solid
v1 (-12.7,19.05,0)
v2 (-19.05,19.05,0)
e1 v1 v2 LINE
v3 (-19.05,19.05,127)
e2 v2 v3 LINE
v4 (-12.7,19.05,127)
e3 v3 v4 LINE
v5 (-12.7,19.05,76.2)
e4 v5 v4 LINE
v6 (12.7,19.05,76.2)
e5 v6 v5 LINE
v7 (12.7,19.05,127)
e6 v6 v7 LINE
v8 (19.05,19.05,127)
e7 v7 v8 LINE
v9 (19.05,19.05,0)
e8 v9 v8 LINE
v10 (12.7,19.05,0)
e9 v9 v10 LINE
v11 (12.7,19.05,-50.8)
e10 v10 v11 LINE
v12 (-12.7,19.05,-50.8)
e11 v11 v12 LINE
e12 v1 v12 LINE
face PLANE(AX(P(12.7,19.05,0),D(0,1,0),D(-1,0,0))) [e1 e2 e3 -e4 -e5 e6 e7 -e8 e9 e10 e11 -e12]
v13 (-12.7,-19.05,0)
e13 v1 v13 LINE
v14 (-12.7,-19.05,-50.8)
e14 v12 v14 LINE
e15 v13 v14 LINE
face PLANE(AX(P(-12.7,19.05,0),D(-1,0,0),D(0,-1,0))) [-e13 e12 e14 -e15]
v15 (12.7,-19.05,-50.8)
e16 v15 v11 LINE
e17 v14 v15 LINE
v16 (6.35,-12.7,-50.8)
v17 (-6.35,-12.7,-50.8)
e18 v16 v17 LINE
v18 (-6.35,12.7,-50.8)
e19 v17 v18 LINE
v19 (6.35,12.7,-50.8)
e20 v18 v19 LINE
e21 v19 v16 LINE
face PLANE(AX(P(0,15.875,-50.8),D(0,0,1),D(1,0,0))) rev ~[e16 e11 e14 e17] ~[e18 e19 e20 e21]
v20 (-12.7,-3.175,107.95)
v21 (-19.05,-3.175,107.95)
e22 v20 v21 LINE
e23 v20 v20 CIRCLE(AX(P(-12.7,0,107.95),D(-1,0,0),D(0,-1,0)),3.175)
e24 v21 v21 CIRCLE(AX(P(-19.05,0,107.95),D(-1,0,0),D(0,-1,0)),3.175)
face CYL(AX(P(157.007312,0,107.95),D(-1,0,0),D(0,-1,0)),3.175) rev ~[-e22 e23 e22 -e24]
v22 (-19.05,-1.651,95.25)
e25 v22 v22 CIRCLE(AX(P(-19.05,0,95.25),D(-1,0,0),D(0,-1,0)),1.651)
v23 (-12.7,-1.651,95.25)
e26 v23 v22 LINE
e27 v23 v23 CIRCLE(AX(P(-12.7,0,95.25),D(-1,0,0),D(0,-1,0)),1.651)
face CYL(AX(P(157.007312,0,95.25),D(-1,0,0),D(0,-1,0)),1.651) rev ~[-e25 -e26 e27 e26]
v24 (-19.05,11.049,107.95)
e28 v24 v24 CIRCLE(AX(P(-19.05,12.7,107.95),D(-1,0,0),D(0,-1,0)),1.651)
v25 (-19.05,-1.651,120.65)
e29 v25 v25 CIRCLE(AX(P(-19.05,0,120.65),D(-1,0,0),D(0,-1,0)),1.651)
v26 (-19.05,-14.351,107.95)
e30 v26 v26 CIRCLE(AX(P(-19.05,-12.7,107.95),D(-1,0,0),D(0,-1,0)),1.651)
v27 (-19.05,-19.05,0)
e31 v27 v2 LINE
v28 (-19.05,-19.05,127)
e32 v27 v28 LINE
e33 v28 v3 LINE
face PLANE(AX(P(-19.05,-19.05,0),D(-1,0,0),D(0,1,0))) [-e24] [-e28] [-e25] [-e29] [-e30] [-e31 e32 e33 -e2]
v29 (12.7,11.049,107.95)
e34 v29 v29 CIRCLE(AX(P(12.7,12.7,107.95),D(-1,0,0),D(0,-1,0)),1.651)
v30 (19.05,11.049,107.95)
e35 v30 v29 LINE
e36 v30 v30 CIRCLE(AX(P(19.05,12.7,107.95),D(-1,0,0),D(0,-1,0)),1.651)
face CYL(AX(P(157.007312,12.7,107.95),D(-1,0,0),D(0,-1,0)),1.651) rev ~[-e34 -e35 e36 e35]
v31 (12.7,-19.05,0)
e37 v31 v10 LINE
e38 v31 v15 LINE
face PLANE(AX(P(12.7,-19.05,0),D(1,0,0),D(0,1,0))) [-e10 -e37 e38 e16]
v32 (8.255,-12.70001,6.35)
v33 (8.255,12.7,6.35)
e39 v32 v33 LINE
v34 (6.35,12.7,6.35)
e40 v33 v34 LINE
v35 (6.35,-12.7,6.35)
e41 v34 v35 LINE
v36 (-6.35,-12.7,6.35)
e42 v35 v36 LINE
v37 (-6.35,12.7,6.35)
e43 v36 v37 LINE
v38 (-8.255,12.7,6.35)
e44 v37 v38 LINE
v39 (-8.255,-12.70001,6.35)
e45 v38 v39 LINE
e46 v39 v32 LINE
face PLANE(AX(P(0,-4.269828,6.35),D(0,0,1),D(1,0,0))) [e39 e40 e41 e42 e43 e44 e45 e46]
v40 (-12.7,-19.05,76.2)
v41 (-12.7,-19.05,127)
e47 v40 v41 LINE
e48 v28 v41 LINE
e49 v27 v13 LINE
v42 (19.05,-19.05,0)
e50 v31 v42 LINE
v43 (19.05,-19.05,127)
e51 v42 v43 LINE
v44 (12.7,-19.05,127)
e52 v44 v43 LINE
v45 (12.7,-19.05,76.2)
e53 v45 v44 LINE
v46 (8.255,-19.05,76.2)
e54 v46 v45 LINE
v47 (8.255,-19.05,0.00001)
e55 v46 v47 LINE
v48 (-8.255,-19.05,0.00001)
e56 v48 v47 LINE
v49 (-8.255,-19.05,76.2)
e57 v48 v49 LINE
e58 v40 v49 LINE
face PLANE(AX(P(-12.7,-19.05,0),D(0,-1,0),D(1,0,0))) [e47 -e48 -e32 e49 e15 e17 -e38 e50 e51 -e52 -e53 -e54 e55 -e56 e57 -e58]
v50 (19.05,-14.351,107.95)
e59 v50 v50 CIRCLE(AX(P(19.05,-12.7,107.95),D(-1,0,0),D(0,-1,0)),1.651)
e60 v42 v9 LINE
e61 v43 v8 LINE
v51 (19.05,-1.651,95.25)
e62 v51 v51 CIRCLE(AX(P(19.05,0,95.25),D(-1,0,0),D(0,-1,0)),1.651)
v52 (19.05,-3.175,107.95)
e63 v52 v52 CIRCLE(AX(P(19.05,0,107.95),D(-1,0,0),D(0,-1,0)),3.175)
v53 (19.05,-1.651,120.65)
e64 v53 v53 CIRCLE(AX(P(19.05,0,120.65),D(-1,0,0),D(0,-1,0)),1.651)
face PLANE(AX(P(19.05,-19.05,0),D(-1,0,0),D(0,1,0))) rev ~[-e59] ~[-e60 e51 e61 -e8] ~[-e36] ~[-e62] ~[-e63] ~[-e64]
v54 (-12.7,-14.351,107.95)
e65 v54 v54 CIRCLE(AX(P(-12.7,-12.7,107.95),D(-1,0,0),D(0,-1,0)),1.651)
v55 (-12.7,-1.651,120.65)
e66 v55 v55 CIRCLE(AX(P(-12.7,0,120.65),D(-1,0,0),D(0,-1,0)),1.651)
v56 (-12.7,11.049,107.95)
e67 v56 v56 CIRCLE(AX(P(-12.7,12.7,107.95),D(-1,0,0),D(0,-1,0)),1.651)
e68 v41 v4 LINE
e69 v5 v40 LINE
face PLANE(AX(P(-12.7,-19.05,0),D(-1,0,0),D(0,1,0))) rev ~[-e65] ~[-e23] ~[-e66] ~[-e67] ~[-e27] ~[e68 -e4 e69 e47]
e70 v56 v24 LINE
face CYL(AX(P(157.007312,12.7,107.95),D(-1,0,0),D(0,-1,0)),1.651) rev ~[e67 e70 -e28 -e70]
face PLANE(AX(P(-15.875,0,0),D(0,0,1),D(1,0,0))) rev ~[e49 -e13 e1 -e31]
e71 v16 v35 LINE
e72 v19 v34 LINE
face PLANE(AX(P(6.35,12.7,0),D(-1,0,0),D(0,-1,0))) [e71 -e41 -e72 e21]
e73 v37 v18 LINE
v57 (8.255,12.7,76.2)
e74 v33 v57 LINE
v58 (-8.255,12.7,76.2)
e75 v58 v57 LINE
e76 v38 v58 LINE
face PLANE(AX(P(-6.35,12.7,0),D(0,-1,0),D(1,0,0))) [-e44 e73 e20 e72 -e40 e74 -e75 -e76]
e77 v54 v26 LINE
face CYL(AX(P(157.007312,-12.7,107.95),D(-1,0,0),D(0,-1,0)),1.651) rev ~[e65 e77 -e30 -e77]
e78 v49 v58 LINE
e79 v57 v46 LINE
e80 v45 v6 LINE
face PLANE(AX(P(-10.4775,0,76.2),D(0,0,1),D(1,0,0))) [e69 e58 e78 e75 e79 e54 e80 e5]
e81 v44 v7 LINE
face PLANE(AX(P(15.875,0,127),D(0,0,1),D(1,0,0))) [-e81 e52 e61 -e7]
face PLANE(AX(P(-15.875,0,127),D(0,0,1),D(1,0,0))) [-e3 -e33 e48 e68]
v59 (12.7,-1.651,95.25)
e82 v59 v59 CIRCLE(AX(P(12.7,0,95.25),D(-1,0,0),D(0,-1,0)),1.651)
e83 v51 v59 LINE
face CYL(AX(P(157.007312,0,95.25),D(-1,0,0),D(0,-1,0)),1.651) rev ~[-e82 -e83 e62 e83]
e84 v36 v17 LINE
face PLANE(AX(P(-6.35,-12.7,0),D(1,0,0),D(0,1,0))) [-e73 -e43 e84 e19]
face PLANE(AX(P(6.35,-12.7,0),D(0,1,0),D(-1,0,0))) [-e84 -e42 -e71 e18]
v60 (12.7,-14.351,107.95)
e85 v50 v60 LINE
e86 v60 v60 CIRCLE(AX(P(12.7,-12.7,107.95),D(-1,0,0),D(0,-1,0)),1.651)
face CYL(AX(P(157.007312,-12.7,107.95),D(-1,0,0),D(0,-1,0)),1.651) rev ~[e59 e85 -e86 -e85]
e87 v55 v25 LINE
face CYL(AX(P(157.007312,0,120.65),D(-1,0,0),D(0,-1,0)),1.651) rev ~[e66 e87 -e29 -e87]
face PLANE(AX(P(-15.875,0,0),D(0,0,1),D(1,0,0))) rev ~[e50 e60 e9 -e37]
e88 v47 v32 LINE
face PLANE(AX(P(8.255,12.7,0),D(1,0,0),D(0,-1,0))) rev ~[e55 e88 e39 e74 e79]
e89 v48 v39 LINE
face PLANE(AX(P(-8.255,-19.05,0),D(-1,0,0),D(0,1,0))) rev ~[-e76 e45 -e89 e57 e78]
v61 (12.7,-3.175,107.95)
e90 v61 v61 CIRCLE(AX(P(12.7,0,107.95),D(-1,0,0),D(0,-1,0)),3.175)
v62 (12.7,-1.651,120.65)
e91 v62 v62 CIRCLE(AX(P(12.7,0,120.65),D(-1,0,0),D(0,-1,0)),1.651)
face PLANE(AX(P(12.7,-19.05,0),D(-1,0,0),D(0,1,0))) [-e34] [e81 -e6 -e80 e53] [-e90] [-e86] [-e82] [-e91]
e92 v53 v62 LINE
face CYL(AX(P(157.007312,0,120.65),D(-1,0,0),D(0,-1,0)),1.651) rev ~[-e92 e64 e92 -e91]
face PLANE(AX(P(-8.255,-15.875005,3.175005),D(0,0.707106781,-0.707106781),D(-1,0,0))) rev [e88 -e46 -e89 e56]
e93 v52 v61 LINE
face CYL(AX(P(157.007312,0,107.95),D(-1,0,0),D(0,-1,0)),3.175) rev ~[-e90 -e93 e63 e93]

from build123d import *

# Parameters (mm, degrees)
F1_DEPTH = 6.35
F2_DEPTH = 76.2
F0_W     = 6.35
F0_H     = 38.1
F3_DEPTH = 127
F5_D     = 6.35
F6_SIZE  = 6.34999
F7_D     = 3.302
F8_DEPTH = 50.8


# Not quite as in the source:
# - a fillet or chamfer is up to 0.001 mm smaller than in the source, because OpenCascade refuses the exact size


with BuildPart() as f1:
    # F0 (on Top) → F1 (new body)
    with BuildSketch(Plane.XY):
        Polygon((-6.35, -12.7), (-6.35, 12.7), (-8.255, 12.7), (-8.255, -19.05), (8.255, -19.05), (8.255, 12.7), (6.35, 12.7), (6.35, -12.7), align=None)
    extrude(amount=F1_DEPTH)

    # F0 (on Top) → F2 (join)
    with BuildSketch(Plane.XY):
        Polygon((-8.255, -19.05), (-8.255, 12.7), (-8.255, 19.05), (-12.7, 19.05), (-12.7, -19.05), align=None)
        Polygon((8.255, 19.05), (8.255, 12.7), (8.255, -19.05), (12.7, -19.05), (12.7, 19.05), align=None)
        Polygon((-8.255, 12.7), (-6.35, 12.7), (6.35, 12.7), (8.255, 12.7), (8.255, 19.05), (-8.255, 19.05), align=None)
    extrude(amount=F2_DEPTH)

    # F0 (on Top) → F3 (join)
    with BuildSketch(Plane.XY):
        with Locations((-15.875, 0)):
            Rectangle(F0_W, F0_H)
        with Locations((15.875, 0)):
            Rectangle(F0_W, F0_H)
    extrude(amount=F3_DEPTH)

    # F5 (through all)
    with Locations(Plane.YZ.offset(19.05)):
        with Locations((0, 107.95)):
            Hole(F5_D / 2)

    # F6 (size 6.35 in the source; OpenCascade refuses exactly that, so slightly less here)
    f6_edges = [f1.edges().sort_by_distance(p)[0] for p in [
        (0, -19.05, 6.35),
    ]]
    chamfer(f6_edges, length=F6_SIZE)

    # F7 (through all)
    with Locations(Plane.YZ.offset(19.05)):
        with Locations((0, 120.65), (0, 95.25), (12.7, 107.95), (-12.7, 107.95)):
            Hole(F7_D / 2)

    # F0 (on Top) → F8 (join)
    with BuildSketch(Plane.XY):
        Polygon((-8.255, 12.7), (-6.35, 12.7), (6.35, 12.7), (8.255, 12.7), (8.255, 19.05), (-8.255, 19.05), align=None)
        Polygon((-8.255, -19.05), (-8.255, 12.7), (-8.255, 19.05), (-12.7, 19.05), (-12.7, -19.05), align=None)
        Polygon((-6.35, -12.7), (-6.35, 12.7), (-8.255, 12.7), (-8.255, -19.05), (8.255, -19.05), (8.255, 12.7), (6.35, 12.7), (6.35, -12.7), align=None)
        Polygon((8.255, 19.05), (8.255, 12.7), (8.255, -19.05), (12.7, -19.05), (12.7, 19.05), align=None)
    extrude(amount=-F8_DEPTH)


solid = f1.part
